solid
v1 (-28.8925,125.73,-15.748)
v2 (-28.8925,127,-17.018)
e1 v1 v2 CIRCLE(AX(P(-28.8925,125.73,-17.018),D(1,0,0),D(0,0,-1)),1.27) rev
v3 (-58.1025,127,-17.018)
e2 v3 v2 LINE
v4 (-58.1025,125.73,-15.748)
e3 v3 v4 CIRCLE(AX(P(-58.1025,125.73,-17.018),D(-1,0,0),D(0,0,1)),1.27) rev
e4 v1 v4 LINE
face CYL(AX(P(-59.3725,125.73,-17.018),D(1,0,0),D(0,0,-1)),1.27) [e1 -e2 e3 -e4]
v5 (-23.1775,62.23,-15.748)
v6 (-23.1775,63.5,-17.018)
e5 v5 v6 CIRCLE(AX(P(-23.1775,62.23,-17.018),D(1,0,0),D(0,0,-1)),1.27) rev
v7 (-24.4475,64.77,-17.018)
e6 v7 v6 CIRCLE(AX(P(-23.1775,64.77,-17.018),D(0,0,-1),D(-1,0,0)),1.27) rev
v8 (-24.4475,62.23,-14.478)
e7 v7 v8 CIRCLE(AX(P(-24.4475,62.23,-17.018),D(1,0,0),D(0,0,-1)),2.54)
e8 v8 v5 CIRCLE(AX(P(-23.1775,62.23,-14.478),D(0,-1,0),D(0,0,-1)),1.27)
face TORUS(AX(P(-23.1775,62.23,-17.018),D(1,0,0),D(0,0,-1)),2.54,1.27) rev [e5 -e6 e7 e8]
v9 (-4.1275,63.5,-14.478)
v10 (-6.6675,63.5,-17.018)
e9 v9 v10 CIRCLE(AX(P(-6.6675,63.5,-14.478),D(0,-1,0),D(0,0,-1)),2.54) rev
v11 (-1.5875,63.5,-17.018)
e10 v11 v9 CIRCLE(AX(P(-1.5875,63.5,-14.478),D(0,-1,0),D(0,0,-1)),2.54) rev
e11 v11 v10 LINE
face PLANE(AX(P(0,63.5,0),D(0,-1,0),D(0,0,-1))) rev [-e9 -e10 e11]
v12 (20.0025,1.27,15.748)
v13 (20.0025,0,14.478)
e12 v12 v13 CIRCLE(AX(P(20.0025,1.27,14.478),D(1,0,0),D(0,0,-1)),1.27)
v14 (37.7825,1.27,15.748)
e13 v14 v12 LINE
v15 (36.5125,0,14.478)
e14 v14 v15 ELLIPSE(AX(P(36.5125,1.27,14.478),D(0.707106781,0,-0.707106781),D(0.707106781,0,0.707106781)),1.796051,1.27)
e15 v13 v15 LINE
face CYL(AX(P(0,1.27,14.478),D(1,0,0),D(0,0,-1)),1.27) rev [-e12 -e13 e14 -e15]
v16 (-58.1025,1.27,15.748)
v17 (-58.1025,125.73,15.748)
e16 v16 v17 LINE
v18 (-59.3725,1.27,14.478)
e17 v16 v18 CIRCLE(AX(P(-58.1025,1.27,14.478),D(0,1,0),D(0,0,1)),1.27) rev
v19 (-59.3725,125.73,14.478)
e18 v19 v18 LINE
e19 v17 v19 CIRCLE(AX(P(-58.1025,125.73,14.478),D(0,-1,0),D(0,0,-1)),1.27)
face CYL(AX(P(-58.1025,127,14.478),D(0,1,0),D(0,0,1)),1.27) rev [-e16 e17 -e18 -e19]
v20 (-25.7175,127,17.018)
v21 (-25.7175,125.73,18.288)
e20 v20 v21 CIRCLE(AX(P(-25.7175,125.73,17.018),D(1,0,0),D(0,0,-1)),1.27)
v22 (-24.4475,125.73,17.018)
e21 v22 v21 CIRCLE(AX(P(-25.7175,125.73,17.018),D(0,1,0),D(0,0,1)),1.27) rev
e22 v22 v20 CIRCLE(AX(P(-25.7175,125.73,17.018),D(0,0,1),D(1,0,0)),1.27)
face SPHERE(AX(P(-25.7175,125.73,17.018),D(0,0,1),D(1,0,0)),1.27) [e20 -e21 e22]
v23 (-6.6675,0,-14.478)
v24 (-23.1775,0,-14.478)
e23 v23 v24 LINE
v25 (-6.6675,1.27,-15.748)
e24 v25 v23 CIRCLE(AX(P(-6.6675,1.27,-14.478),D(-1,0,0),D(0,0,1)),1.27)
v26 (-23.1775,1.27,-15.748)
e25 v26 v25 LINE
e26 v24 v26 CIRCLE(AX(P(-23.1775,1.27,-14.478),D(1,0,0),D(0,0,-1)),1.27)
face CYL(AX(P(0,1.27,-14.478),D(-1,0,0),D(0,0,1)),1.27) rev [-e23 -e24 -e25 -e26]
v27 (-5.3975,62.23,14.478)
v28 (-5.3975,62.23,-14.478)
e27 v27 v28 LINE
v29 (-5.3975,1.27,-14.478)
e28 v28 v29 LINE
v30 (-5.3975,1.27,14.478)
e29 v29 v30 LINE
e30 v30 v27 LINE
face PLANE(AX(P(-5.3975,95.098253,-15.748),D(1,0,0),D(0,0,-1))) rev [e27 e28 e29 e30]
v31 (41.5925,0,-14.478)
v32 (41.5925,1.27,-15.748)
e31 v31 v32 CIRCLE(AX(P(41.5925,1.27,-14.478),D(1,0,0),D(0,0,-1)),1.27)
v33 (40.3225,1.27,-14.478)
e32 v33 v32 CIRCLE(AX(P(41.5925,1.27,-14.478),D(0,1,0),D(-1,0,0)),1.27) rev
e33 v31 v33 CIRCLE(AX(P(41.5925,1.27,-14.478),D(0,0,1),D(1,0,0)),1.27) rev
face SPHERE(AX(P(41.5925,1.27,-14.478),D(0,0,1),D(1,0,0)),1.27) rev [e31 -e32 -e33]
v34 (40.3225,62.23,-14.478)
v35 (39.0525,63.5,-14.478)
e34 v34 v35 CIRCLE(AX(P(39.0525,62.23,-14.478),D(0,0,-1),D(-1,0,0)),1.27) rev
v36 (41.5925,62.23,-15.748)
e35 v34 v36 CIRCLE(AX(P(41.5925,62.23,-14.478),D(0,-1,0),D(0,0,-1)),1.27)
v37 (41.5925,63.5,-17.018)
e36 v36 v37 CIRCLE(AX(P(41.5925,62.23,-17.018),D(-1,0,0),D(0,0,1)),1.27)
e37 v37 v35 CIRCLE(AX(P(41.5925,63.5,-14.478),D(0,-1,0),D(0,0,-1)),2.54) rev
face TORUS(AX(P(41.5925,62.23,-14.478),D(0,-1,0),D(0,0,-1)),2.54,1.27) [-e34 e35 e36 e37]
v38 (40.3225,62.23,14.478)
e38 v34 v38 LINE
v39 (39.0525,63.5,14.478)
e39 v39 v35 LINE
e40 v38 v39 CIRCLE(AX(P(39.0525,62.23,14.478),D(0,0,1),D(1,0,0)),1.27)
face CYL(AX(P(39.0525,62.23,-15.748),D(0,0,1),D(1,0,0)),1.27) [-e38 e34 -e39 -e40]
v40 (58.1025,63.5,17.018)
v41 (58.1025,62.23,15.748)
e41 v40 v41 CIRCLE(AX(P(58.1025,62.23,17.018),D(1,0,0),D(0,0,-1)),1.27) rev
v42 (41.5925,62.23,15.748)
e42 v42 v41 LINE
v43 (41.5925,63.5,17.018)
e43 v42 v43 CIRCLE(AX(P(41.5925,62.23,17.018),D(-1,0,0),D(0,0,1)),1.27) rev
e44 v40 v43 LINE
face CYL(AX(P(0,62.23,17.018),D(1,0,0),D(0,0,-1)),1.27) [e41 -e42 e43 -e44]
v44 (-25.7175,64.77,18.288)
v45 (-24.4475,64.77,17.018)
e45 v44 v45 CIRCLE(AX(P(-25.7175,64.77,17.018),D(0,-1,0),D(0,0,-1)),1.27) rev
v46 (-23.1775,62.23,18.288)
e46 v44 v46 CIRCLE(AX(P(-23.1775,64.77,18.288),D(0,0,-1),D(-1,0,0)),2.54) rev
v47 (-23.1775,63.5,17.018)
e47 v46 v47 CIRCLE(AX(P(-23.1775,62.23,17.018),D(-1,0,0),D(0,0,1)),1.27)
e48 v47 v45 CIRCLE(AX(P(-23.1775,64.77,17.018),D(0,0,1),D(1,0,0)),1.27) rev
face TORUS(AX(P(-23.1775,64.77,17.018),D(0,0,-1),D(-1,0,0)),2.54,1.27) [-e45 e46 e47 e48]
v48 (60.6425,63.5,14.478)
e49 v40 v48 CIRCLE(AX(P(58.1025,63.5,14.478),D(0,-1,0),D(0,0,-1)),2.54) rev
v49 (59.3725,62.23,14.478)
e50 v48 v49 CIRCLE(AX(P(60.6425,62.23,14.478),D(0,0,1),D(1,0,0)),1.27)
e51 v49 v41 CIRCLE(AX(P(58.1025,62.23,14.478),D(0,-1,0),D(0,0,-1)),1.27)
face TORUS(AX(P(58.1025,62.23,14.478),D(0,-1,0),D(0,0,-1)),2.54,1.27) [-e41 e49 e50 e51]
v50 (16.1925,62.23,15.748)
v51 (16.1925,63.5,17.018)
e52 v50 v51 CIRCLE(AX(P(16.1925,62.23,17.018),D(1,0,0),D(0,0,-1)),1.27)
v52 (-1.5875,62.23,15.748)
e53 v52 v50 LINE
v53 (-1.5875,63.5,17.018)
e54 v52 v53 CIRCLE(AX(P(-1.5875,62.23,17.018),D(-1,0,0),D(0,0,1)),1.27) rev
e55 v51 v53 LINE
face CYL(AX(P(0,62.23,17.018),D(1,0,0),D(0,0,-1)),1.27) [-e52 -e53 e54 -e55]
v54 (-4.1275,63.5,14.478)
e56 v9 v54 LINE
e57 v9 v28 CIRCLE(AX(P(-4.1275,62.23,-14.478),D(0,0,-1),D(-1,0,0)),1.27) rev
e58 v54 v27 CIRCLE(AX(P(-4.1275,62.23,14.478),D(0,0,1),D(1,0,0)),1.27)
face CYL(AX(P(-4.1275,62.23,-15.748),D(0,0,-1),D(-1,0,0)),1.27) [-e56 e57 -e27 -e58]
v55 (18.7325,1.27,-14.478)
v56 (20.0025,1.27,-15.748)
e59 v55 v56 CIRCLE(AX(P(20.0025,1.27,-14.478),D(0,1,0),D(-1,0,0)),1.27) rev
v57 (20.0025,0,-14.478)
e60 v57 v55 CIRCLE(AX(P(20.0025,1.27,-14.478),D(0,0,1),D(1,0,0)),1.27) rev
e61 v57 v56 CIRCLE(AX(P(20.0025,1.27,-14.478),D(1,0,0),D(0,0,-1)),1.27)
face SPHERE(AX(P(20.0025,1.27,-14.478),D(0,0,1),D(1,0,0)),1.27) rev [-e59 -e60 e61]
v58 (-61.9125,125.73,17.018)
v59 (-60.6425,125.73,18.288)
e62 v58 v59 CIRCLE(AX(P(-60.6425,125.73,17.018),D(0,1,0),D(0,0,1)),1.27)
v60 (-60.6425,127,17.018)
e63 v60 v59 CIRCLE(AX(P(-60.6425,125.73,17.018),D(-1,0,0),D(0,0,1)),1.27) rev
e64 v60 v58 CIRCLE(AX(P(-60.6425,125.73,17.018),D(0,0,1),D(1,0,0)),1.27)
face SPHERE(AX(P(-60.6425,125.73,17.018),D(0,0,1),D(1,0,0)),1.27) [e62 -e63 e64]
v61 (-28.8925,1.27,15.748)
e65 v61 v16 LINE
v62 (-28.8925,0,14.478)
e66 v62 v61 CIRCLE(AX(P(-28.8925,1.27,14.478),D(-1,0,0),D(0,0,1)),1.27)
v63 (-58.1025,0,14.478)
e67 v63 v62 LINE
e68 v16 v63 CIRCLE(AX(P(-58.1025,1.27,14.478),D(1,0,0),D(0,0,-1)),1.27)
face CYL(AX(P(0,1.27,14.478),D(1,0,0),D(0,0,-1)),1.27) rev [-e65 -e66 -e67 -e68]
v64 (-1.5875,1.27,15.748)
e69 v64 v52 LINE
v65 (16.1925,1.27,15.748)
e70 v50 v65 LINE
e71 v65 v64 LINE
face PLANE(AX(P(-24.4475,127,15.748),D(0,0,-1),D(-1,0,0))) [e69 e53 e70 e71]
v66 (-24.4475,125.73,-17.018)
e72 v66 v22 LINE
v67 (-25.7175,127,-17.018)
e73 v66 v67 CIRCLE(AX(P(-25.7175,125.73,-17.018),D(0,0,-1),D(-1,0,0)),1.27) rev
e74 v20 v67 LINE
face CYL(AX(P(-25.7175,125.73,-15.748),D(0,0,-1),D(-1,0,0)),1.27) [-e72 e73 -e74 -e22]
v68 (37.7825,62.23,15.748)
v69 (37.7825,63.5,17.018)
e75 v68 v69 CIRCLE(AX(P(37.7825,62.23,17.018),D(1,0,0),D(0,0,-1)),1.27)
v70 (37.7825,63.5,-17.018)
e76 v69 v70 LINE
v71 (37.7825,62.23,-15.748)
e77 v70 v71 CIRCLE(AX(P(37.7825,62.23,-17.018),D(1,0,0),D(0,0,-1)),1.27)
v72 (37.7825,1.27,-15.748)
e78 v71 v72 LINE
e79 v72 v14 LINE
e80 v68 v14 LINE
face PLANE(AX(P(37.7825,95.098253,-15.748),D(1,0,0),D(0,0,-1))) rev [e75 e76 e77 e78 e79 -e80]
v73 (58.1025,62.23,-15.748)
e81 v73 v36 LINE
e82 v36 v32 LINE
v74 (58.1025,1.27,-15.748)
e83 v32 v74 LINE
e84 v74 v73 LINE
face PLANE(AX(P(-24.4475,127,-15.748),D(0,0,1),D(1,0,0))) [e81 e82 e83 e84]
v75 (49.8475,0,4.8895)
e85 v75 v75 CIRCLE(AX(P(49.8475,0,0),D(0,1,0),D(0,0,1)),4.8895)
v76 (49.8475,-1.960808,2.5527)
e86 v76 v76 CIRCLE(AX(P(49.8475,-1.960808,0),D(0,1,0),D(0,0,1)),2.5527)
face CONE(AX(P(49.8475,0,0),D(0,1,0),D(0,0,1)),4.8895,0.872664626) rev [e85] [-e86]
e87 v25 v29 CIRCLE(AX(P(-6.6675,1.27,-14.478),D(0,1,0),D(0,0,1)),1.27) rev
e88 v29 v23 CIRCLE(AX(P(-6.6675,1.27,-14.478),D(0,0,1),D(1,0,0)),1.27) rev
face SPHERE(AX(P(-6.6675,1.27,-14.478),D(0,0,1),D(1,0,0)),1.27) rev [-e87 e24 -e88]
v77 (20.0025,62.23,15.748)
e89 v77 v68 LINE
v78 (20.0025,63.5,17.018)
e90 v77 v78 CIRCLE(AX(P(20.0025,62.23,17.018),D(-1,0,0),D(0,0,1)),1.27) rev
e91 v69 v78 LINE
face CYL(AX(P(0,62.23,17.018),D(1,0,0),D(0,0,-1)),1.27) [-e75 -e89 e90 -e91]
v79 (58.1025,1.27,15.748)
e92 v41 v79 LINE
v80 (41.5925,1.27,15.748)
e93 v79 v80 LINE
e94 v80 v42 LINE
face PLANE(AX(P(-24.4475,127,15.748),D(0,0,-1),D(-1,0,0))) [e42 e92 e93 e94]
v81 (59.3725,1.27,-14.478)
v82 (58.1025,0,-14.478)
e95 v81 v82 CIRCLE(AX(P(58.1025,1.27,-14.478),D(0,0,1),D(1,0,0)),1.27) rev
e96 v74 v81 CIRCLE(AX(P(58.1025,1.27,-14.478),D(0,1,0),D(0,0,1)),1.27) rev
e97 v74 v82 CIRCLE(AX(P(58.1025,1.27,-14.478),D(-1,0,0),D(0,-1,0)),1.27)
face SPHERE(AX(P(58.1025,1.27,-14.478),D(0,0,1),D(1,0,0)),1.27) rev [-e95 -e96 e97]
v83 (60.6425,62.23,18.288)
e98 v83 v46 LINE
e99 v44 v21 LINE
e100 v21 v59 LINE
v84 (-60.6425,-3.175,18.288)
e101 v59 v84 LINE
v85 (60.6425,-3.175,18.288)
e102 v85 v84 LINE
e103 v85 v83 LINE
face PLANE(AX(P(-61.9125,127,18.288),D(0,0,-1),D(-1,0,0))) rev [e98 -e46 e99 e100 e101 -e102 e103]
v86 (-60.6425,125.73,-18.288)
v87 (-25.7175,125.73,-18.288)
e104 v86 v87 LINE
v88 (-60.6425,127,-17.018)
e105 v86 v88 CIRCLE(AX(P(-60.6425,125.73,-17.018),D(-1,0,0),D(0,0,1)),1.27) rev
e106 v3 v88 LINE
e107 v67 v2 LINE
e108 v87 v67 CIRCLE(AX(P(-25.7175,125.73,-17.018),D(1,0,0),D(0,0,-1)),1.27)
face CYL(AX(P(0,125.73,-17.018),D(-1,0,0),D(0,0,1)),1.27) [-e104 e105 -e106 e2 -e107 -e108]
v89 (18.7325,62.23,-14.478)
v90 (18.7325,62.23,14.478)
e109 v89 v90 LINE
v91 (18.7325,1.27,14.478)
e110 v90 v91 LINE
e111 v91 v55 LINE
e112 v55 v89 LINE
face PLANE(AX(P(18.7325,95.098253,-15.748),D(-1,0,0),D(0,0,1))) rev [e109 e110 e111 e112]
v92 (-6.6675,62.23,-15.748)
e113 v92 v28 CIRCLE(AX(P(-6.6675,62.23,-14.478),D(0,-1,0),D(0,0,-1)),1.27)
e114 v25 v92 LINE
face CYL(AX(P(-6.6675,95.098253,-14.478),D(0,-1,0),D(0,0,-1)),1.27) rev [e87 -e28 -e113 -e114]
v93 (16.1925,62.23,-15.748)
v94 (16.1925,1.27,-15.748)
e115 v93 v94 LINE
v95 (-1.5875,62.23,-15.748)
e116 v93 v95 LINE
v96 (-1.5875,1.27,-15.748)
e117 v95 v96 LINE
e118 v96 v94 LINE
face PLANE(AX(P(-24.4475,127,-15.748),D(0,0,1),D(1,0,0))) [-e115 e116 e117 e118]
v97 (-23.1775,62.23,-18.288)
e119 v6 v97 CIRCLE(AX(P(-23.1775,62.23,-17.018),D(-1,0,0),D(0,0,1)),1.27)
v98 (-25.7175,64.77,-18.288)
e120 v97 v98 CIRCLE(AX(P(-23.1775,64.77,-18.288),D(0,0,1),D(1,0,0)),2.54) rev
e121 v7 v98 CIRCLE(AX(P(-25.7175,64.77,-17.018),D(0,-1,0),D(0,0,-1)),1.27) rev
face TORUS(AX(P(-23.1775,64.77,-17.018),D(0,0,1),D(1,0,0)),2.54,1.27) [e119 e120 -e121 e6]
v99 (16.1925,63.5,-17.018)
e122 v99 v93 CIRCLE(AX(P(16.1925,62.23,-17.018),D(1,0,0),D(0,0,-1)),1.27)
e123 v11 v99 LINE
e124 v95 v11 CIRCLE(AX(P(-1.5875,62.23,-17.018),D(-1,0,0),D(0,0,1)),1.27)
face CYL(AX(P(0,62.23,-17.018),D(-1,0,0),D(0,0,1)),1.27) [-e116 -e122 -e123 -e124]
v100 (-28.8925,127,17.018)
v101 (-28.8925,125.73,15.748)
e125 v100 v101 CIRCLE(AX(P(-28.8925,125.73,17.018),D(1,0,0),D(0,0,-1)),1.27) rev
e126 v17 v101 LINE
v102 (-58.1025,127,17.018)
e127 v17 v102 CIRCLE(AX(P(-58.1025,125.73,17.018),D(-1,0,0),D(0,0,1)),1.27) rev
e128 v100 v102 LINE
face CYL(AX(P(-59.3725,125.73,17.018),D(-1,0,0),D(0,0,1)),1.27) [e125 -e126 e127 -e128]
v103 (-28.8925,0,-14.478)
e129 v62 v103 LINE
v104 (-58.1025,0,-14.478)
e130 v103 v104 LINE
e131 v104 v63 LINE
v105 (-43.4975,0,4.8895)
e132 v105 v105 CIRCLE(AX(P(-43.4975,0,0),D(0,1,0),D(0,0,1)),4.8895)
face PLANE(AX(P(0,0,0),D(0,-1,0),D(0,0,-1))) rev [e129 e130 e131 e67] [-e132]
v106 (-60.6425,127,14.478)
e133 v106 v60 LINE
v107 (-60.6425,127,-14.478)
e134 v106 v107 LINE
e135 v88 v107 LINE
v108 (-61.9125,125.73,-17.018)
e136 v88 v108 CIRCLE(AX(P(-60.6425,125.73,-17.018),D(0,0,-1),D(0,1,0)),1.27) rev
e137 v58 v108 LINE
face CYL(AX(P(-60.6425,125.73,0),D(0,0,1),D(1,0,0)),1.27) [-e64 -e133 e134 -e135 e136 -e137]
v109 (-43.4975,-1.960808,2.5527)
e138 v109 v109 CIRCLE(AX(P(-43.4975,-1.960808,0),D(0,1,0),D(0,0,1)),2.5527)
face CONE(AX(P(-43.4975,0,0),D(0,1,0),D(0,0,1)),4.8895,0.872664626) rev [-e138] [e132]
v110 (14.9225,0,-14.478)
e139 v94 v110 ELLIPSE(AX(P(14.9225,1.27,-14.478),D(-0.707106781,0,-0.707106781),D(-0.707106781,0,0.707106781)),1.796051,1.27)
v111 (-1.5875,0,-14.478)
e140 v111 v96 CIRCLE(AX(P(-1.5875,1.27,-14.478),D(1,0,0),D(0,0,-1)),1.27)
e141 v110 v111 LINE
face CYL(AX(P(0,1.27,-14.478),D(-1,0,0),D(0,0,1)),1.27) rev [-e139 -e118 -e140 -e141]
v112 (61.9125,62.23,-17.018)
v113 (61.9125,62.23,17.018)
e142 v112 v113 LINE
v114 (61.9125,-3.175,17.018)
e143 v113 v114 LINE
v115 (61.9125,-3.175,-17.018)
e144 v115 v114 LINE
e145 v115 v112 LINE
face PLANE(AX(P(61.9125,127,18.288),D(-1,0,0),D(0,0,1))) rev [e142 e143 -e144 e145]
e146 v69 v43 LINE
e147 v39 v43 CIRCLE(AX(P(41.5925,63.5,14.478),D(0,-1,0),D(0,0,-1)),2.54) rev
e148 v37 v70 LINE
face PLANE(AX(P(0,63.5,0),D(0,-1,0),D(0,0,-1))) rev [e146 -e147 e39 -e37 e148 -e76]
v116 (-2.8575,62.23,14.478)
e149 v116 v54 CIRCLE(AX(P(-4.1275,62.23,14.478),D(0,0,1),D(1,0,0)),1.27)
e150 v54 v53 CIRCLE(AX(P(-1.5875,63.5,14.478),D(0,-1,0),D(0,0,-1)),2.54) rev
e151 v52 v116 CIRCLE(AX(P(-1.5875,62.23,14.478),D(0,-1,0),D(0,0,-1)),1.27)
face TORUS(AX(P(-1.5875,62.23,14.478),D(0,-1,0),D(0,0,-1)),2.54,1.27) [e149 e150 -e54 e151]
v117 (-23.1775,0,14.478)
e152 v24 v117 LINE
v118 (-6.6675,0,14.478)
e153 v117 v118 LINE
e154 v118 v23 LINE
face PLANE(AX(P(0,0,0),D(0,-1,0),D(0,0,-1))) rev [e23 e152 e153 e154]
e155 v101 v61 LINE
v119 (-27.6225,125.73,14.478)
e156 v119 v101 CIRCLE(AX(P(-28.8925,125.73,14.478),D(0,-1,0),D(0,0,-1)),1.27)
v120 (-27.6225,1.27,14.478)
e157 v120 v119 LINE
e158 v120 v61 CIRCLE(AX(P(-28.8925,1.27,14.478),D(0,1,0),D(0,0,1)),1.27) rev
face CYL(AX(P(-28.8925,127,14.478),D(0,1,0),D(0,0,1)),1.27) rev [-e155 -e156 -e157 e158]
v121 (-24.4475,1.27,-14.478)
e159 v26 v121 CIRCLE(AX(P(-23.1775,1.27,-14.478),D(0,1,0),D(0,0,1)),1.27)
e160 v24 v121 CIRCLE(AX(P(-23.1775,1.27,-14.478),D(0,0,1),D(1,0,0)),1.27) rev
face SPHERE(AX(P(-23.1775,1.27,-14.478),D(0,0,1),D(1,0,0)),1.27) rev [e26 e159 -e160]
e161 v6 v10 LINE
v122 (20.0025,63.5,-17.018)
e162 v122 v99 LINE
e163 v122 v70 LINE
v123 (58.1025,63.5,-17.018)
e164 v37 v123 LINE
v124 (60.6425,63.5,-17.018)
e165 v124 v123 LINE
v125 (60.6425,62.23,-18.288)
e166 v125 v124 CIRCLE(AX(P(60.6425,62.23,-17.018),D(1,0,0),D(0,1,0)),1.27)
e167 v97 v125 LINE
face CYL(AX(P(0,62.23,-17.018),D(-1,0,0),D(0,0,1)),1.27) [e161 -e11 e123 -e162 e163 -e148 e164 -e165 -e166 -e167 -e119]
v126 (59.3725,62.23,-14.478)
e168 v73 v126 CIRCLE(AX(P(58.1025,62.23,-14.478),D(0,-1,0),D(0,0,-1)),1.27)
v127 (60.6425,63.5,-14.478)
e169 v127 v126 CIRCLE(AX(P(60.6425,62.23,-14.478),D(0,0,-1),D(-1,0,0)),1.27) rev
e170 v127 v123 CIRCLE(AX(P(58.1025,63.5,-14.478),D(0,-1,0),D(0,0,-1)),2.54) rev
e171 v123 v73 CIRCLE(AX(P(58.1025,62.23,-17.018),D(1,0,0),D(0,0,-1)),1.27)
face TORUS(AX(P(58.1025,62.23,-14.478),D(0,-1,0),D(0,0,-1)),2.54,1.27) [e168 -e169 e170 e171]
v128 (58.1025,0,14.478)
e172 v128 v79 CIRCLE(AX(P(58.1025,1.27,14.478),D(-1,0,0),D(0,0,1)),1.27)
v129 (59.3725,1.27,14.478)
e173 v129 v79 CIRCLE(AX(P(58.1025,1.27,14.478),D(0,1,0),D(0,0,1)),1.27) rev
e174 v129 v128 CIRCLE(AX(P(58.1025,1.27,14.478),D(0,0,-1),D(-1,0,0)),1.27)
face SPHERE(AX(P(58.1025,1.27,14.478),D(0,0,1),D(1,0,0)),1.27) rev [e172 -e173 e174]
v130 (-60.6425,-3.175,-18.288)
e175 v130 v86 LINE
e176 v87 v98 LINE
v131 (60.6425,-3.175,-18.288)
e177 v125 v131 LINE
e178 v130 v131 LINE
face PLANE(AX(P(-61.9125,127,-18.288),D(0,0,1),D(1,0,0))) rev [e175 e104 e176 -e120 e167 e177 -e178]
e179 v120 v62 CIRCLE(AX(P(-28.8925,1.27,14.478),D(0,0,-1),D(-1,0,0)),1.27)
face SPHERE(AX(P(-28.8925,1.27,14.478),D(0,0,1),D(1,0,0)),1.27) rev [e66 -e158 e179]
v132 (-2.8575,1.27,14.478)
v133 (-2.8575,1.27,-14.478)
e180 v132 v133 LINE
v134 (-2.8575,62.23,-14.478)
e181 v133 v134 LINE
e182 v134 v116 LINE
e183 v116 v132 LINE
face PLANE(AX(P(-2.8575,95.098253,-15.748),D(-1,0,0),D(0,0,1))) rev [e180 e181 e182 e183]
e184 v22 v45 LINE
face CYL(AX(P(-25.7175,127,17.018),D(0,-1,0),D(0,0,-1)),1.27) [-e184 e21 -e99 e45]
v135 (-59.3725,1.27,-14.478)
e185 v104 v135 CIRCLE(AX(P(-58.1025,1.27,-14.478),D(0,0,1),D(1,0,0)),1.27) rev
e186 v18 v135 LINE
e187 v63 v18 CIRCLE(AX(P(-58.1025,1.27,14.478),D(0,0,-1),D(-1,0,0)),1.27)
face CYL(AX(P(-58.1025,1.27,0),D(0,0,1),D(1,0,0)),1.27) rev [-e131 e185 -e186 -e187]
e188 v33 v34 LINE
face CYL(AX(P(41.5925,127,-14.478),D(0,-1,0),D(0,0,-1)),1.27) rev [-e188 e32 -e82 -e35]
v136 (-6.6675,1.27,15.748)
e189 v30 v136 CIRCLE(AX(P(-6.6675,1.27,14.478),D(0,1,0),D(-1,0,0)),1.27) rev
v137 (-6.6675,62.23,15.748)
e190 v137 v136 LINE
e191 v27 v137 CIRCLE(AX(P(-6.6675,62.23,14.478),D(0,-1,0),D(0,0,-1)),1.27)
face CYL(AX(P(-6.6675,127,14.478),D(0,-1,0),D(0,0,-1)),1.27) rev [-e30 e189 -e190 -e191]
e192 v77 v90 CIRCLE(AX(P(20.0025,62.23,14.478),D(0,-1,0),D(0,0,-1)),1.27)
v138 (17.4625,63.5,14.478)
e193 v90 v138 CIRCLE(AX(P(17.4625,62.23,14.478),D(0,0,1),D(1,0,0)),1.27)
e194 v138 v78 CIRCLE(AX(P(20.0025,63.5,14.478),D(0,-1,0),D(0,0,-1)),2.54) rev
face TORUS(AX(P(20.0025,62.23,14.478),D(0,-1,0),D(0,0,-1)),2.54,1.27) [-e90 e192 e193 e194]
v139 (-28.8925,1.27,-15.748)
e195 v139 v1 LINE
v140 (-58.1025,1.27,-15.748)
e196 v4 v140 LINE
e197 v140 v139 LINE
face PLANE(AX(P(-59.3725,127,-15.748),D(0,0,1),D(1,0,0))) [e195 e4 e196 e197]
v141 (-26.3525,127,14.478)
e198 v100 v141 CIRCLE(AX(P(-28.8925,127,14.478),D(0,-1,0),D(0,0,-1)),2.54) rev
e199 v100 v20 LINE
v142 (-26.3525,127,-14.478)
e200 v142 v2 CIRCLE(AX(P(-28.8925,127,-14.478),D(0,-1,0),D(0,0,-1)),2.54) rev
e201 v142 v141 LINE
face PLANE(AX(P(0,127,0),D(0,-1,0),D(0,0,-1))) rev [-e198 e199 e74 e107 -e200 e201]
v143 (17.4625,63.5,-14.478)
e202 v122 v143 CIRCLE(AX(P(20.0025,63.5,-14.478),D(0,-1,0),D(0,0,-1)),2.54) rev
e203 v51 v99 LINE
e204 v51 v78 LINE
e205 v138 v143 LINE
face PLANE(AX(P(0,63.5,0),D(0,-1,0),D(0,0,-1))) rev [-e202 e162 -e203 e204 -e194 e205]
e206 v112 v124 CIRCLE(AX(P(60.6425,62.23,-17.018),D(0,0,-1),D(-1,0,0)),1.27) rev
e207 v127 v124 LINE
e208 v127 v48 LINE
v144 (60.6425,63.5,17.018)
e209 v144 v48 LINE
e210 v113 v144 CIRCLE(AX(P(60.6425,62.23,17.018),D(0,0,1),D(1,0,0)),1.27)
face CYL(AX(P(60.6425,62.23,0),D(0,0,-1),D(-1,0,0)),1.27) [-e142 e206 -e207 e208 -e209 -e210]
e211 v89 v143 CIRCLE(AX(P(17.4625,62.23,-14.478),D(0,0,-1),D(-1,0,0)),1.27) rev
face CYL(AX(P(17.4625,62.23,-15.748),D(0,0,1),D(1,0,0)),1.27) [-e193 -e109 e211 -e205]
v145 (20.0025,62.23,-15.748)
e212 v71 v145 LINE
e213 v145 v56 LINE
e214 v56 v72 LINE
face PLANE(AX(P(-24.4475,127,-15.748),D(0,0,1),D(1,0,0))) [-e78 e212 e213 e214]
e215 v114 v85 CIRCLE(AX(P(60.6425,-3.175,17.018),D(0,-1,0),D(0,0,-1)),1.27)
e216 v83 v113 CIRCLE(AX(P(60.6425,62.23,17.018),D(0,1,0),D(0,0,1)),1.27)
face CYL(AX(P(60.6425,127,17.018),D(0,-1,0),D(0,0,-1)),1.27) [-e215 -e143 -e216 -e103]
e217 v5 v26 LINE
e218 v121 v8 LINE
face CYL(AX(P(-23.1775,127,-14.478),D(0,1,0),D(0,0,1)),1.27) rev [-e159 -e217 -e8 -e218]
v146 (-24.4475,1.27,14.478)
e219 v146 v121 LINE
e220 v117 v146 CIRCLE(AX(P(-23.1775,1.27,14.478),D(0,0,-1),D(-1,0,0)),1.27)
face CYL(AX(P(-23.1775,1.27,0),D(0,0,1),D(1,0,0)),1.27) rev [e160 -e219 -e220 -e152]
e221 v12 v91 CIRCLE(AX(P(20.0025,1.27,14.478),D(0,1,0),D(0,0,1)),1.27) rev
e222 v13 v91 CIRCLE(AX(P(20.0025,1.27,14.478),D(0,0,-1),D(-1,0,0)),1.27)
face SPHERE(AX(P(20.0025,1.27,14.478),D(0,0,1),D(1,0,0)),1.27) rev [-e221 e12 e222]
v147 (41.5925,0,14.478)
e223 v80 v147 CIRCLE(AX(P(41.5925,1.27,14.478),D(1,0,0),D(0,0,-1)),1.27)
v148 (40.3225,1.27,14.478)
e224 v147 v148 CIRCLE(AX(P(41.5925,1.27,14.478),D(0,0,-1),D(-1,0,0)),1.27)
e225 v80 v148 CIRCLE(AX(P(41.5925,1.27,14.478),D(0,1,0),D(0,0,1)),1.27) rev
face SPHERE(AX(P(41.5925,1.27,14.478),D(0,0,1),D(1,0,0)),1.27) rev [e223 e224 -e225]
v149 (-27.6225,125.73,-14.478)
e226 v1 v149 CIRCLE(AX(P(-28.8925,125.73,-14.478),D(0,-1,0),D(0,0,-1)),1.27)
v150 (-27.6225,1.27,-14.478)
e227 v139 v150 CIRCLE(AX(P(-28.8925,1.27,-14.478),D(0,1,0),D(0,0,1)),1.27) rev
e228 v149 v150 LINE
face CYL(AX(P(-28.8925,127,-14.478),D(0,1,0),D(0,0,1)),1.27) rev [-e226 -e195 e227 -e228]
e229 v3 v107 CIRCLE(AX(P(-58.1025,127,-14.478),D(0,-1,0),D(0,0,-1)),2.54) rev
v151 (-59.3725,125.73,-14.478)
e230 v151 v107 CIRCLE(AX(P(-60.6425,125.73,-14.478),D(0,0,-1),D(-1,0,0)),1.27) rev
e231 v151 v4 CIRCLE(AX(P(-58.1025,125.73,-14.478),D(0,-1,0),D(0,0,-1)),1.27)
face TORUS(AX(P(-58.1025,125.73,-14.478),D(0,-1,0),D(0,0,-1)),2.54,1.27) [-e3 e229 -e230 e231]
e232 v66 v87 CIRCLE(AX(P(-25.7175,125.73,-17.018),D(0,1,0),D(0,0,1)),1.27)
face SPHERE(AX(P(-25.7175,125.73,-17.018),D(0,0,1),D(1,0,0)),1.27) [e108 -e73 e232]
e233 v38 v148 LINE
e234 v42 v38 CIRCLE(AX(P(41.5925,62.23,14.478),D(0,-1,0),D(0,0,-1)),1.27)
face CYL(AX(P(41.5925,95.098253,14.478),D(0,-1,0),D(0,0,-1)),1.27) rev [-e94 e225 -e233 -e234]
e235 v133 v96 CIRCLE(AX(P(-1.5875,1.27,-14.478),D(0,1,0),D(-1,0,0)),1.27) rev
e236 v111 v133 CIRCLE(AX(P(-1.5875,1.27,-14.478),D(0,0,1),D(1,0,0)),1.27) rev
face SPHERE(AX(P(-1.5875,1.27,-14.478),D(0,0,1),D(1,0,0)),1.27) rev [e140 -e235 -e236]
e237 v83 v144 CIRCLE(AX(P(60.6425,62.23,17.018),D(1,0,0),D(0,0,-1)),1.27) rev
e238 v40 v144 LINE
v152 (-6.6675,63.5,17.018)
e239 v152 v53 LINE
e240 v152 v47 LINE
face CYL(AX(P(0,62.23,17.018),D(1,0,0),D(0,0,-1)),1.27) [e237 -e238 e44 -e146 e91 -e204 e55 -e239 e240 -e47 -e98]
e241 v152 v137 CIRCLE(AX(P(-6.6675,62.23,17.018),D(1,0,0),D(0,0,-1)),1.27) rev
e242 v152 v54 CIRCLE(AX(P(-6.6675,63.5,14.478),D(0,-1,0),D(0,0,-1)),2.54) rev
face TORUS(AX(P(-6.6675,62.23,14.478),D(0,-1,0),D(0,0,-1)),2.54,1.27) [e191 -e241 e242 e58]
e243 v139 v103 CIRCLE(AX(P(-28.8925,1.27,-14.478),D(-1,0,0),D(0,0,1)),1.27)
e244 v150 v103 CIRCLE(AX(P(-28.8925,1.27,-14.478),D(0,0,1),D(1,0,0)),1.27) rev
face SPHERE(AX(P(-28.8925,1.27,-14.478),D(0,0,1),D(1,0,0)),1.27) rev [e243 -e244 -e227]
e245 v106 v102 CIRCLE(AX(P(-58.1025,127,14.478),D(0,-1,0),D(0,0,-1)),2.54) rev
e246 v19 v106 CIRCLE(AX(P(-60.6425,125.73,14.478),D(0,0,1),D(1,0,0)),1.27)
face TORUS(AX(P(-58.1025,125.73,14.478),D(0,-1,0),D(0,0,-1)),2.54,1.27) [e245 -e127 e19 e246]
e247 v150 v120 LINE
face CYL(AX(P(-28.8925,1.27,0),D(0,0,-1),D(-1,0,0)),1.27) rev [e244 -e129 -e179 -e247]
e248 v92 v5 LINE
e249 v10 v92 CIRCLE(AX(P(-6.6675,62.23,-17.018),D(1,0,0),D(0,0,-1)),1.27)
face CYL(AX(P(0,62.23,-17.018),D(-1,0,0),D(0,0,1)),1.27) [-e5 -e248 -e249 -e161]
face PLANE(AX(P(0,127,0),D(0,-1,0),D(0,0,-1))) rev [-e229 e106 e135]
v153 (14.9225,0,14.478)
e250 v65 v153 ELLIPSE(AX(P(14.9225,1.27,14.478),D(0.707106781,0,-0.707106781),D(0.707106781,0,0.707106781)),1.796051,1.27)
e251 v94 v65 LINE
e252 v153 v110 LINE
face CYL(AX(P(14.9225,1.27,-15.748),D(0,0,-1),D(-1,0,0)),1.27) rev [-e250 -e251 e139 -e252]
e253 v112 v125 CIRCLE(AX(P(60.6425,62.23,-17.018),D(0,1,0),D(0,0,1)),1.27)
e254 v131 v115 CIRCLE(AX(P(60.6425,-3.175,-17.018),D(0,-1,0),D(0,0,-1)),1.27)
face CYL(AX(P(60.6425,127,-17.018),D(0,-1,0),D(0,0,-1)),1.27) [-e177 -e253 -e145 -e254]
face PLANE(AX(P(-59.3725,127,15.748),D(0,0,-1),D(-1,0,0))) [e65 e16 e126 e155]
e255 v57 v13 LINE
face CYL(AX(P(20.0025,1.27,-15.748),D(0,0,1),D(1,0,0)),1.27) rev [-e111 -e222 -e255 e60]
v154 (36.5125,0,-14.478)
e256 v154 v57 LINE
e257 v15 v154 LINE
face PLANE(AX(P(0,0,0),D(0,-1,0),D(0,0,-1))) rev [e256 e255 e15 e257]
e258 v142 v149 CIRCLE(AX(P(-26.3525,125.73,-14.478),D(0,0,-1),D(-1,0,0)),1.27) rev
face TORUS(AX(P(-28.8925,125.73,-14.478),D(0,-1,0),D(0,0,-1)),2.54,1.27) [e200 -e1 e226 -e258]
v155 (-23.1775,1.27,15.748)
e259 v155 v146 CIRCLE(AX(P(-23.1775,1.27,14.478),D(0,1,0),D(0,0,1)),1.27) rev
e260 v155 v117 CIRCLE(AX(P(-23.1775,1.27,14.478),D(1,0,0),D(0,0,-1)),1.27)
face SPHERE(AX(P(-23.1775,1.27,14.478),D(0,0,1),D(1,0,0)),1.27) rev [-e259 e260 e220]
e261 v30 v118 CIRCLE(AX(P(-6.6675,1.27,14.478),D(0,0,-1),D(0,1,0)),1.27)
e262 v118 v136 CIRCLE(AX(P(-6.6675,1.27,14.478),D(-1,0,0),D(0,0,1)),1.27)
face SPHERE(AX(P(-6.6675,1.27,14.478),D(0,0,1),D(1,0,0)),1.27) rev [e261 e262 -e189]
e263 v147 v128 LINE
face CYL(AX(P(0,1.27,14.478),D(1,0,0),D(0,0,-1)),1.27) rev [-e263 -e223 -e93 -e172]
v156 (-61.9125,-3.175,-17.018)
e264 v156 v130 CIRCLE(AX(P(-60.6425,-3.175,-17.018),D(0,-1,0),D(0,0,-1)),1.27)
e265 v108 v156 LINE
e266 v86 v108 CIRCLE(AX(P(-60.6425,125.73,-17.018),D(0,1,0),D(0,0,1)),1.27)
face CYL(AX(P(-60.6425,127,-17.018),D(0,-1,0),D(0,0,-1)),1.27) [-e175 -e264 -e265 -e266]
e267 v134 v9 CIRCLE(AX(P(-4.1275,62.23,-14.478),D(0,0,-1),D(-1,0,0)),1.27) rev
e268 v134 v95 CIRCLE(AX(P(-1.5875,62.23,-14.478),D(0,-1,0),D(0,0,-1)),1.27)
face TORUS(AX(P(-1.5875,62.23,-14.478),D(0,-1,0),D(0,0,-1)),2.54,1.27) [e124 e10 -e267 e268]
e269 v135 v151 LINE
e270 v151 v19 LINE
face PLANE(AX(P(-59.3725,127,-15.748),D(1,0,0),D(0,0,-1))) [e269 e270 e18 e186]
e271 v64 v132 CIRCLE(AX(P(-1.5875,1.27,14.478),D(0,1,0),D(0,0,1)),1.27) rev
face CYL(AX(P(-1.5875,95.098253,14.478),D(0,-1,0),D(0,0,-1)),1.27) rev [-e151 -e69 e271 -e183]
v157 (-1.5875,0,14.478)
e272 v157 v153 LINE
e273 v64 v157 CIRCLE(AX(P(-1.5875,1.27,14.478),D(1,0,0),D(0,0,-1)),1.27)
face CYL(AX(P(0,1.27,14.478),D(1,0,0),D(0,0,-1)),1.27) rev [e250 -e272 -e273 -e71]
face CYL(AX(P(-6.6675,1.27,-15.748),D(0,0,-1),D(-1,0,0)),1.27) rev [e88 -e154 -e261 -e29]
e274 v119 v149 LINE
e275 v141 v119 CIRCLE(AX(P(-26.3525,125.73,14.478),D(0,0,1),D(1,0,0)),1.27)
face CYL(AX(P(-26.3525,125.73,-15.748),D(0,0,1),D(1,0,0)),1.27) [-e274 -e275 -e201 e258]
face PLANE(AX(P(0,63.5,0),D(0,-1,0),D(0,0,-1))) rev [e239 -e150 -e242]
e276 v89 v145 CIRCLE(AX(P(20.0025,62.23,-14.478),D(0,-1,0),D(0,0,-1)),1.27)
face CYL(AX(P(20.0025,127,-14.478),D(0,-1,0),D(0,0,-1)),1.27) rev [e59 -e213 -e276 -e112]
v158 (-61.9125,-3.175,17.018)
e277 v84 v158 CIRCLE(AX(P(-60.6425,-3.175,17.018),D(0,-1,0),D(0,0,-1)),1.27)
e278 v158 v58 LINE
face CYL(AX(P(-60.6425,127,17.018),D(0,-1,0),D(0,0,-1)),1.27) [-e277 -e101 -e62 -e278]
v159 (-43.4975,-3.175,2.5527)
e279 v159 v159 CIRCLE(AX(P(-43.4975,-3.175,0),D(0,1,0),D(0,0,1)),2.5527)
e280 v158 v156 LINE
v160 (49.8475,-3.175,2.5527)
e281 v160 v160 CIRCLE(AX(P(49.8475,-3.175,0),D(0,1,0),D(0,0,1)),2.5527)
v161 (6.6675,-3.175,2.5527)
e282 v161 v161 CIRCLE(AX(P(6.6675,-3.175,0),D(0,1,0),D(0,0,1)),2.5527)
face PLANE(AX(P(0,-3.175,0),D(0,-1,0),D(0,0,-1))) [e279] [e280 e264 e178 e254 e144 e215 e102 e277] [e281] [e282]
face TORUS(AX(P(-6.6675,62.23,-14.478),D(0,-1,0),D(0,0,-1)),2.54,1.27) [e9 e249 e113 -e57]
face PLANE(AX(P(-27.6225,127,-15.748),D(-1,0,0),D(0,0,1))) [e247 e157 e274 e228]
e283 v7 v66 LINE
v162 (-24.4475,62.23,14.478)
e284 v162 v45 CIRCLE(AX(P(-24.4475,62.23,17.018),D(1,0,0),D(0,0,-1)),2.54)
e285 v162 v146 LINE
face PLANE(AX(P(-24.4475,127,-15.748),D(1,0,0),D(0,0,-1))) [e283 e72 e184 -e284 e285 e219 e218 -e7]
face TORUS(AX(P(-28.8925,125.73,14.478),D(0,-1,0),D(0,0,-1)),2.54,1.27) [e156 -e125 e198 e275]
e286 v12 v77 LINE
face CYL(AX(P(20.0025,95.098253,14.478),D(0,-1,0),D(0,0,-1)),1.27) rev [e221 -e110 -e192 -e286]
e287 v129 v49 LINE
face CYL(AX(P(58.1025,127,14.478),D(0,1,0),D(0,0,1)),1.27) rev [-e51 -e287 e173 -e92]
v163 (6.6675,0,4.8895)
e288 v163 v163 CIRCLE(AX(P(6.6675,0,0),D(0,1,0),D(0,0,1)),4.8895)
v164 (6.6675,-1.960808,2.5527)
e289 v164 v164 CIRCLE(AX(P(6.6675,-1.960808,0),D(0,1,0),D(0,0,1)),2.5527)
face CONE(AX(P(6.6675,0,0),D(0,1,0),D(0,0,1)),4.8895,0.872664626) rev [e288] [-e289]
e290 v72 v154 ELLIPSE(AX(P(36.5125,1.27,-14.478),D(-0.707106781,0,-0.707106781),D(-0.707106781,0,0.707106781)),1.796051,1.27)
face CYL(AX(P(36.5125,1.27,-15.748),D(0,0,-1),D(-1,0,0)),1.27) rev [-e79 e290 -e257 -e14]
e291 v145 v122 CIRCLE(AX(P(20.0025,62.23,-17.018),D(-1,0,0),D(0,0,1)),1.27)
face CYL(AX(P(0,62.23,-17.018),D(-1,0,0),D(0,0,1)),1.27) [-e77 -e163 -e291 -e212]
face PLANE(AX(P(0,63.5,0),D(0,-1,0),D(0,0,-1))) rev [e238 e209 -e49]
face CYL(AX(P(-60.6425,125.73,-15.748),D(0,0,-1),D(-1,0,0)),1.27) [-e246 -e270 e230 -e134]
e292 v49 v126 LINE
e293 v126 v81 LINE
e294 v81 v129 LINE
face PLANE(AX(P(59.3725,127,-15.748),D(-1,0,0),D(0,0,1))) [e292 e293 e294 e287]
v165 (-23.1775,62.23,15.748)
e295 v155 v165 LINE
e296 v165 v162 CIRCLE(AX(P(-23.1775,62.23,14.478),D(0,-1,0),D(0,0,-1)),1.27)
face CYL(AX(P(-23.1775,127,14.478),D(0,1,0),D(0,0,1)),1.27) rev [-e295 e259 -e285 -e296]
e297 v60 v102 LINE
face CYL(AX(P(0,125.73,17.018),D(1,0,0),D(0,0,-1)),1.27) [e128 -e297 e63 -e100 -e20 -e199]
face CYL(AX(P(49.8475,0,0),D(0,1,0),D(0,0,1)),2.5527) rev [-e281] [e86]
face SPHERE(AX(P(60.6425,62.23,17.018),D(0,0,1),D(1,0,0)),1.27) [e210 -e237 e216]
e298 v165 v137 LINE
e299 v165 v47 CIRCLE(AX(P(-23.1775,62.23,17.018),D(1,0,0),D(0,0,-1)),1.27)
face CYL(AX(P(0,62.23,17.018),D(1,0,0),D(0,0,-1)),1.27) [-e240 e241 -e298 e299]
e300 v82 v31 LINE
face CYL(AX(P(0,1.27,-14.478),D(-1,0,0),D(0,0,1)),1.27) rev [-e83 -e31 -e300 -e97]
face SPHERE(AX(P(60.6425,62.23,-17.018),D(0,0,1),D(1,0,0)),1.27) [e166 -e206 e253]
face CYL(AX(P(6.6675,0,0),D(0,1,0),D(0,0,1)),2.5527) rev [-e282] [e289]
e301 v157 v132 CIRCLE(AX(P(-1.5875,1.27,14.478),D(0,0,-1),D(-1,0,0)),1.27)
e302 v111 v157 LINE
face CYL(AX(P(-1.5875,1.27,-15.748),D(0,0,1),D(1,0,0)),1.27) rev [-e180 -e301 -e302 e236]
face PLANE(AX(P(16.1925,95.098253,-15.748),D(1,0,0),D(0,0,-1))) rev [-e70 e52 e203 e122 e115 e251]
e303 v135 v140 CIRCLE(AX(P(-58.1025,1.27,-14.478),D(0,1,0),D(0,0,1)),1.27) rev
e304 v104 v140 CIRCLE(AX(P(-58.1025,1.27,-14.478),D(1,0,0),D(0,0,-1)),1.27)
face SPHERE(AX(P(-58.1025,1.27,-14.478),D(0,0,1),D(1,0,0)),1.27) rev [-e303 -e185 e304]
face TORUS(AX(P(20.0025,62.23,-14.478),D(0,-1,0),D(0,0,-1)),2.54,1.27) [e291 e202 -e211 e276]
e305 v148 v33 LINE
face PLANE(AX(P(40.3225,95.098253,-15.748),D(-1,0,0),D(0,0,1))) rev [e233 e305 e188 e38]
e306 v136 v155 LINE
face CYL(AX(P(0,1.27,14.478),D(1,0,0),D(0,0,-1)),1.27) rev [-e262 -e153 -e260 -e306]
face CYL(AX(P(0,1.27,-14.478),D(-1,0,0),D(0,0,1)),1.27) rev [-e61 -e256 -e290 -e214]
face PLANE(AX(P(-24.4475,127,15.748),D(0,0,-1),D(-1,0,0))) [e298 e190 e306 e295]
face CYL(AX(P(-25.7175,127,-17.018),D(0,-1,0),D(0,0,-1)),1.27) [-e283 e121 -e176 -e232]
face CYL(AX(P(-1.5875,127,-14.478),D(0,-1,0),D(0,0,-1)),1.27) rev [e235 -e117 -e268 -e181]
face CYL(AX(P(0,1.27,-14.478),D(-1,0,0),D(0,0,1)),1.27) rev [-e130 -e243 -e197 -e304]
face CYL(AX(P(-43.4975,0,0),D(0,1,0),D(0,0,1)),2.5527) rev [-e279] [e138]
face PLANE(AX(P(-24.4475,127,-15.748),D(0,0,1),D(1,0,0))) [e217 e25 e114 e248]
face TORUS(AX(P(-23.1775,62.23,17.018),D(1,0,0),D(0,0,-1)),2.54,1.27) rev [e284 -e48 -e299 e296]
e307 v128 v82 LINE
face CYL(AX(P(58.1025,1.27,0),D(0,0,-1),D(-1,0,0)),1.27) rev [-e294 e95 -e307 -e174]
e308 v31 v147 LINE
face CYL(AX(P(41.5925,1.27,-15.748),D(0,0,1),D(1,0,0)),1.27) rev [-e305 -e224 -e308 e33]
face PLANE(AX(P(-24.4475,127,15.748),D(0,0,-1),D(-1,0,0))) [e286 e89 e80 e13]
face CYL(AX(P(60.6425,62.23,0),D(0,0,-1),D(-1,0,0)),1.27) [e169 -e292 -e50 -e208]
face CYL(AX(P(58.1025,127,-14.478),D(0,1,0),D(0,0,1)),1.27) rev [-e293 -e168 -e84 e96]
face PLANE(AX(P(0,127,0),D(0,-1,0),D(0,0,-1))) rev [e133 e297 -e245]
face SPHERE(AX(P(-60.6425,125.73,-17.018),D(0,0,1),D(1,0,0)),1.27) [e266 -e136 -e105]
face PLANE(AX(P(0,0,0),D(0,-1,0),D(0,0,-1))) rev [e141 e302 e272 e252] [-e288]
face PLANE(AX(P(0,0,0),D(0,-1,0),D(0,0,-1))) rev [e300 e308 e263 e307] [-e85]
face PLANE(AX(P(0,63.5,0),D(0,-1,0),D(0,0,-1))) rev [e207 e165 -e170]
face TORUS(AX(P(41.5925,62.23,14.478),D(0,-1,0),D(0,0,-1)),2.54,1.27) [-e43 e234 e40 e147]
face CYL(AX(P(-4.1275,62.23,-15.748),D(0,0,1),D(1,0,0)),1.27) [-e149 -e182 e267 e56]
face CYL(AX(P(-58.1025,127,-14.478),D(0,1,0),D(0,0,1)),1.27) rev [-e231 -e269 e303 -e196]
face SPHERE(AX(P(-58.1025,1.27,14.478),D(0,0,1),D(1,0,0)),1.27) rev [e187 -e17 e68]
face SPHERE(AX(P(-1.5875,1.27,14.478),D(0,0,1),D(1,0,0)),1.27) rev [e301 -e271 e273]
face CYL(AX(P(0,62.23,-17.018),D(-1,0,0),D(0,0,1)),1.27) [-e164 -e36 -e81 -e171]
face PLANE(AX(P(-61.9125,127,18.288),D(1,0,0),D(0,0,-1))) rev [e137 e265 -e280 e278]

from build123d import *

# Parameters (mm, degrees)
SKETCH1_W                                  = 123.825
SKETCH1_H                                  = 36.576
SKETCH1_W_2                                = 31.75
SKETCH1_H_2                                = 31.496
SKETCH1_W_3                                = 83.82
BOSS_EXTRUDE1_DEPTH                        = 127
SKETCH2_W                                  = 123.825
SKETCH2_H                                  = 36.576
BOSS_EXTRUDE2_DEPTH                        = 3.175
SKETCH3_W                                  = 86.36
SKETCH3_H                                  = 36.576
CUT_EXTRUDE1_DEPTH                         = 63.5
SKETCH5_W                                  = 2.54
SKETCH5_H                                  = 31.496
BOSS_EXTRUDE4_DEPTH                        = 63.5
FILLET1_R                                  = 1.27
CSK_FOR_10_FLAT_HEAD_MACHINE_SCREW_2_COUNT = 2
CSK_FOR_10_FLAT_HEAD_MACHINE_SCREW_2_PITCH = 50.165
CSK_FOR_10_FLAT_HEAD_MACHINE_SCREW_3_COUNT = 2
CSK_FOR_10_FLAT_HEAD_MACHINE_SCREW_3_PITCH = 93.345


with BuildPart() as part:
    # Sketch1 → Boss-Extrude1 (new body)
    with BuildSketch(Plane(origin=(0, 0, 0), x_dir=(1, 0, 0), z_dir=(0, 1, 0))):
        Rectangle(SKETCH1_W, SKETCH1_H)
        with Locations((-43.4975, 0)):
            Rectangle(SKETCH1_W_2, SKETCH1_H_2, mode=Mode.SUBTRACT)
        with Locations((17.4625, 0)):
            Rectangle(SKETCH1_W_3, SKETCH1_H_2, mode=Mode.SUBTRACT)
    extrude(amount=BOSS_EXTRUDE1_DEPTH)

    # Sketch2 → Boss-Extrude2 (add)
    with BuildSketch(Plane.XZ):
        Rectangle(SKETCH2_W, SKETCH2_H)
    extrude(amount=BOSS_EXTRUDE2_DEPTH)

    # Sketch3 → Cut-Extrude1 (cut)
    with BuildSketch(Plane(origin=(0, 127, 0), x_dir=(1, 0, 0), z_dir=(0, 1, 0))):
        with Locations((18.7325, 0)):
            Rectangle(SKETCH3_W, SKETCH3_H)
    extrude(amount=-CUT_EXTRUDE1_DEPTH, mode=Mode.SUBTRACT)

    # Sketch5 → Boss-Extrude4 (add)
    with BuildSketch(Plane(origin=(0, 0, 0), x_dir=(1, 0, 0), z_dir=(0, 1, 0))):
        with Locations((-4.1275, 0)):
            Rectangle(SKETCH5_W, SKETCH5_H)
        with Locations((17.4625, 0)):
            Rectangle(SKETCH5_W, SKETCH5_H)
        with Locations((39.0525, 0)):
            Rectangle(SKETCH5_W, SKETCH5_H)
    extrude(amount=BOSS_EXTRUDE4_DEPTH)

    # Fillet1
    fillet1_edges = [part.edges().sort_by_distance(p)[0] for p in [
        (28.2575, 0, 15.748),
        (6.6675, 0, -15.748),
        (18.7325, 31.75, -15.748),
        (18.7325, 63.5, 0),
        (18.7325, 31.75, 15.748),
        (18.7325, 0, 0),
        (16.1925, 0, 0),
        (49.8475, 63.5, -15.748),
        (28.2575, 63.5, 15.748),
        (49.8475, 0, 15.748),
        (28.2575, 0, -15.748),
        (40.3225, 31.75, -15.748),
        (40.3225, 63.5, 0),
        (40.3225, 31.75, 15.748),
        (40.3225, 0, 0),
        (37.7825, 0, 0),
        (-61.9125, 127, 0),
        (-27.6225, 0, 0),
        (-27.6225, 63.5, 15.748),
        (-43.4975, 0, -15.748),
        (-27.6225, 63.5, -15.748),
        (-59.3725, 0, 0),
        (-59.3725, 63.5, -15.748),
        (-43.4975, 0, 15.748),
        (-59.3725, 63.5, 15.748),
        (-27.6225, 127, 0),
        (-43.18, 127, 18.288),
        (-43.4975, 127, -15.748),
        (-59.3725, 127, 0),
        (-43.4975, 127, 15.748),
        (-24.4475, 0, 0),
        (-14.9225, 0, 15.748),
        (59.3725, 0, 0),
        (49.8475, 0, -15.748),
        (-24.4475, 127, 0),
        (59.3725, 31.75, -15.748),
        (-24.4475, 31.75, -15.748),
        (-14.9225, 63.5, -15.748),
        (59.3725, 31.75, 15.748),
        (-24.4475, 31.75, 15.748),
        (61.9125, 30.1625, 18.288),
        (61.9125, 30.1625, -18.288),
        (-43.18, 127, -18.288),
        (59.3725, 63.5, 0),
        (49.8475, 63.5, 15.748),
        (-24.4475, 63.5, 17.018),
        (-24.4475, 95.25, 18.288),
        (18.7325, 63.5, -18.288),
        (-24.4475, 95.25, -18.288),
        (-24.4475, 63.5, -17.018),
        (18.7325, 63.5, 18.288),
        (61.9125, 63.5, 0),
        (-61.9125, 61.9125, 18.288),
        (-61.9125, 61.9125, -18.288),
        (-14.9225, 63.5, 15.748),
        (6.6675, 63.5, -15.748),
        (-14.9225, 0, -15.748),
        (6.6675, 0, 15.748),
        (-2.8575, 31.75, -15.748),
        (-2.8575, 63.5, 0),
        (-2.8575, 31.75, 15.748),
        (-2.8575, 0, 0),
        (-5.3975, 31.75, 15.748),
        (-5.3975, 63.5, 0),
        (-5.3975, 31.75, -15.748),
        (-5.3975, 0, 0),
        (28.2575, 63.5, -15.748),
        (6.6675, 63.5, 15.748),
    ]]
    fillet(fillet1_edges, radius=FILLET1_R - 0.0001)  # a hair under: the kernel refuses the full size

    # Sketch7 → CSK for #10 Flat Head Machine Screw (100)1 (revolve, cut)
    with BuildSketch(Plane(origin=(-43.4975, 0, 0), x_dir=(0, 0, 1), z_dir=(1, 0, 0))):
        Polygon((0, 0), (0, 3.175), (2.5527, 3.175), (2.5527, 1.960808018), (4.8895, 0), align=None)
    csk_for_10_flat_head_machine_screw_100 = revolve(axis=Axis((-43.4975, 6.35, 0), (0, -1, 0)), mode=Mode.SUBTRACT)

    # CSK for _10 Flat Head Machine Screw  2: CSK for #10 Flat Head Machine Screw (100)1 ×2
    with Locations(*[(i * CSK_FOR_10_FLAT_HEAD_MACHINE_SCREW_2_PITCH, 0, 0) for i in range(1, CSK_FOR_10_FLAT_HEAD_MACHINE_SCREW_2_COUNT)]):
        add(csk_for_10_flat_head_machine_screw_100, mode=Mode.SUBTRACT)

    # CSK for _10 Flat Head Machine Screw  3: CSK for #10 Flat Head Machine Screw (100)1 ×2
    with Locations(*[(i * CSK_FOR_10_FLAT_HEAD_MACHINE_SCREW_3_PITCH, 0, 0) for i in range(1, CSK_FOR_10_FLAT_HEAD_MACHINE_SCREW_3_COUNT)]):
        add(csk_for_10_flat_head_machine_screw_100, mode=Mode.SUBTRACT)


solid = part.part
